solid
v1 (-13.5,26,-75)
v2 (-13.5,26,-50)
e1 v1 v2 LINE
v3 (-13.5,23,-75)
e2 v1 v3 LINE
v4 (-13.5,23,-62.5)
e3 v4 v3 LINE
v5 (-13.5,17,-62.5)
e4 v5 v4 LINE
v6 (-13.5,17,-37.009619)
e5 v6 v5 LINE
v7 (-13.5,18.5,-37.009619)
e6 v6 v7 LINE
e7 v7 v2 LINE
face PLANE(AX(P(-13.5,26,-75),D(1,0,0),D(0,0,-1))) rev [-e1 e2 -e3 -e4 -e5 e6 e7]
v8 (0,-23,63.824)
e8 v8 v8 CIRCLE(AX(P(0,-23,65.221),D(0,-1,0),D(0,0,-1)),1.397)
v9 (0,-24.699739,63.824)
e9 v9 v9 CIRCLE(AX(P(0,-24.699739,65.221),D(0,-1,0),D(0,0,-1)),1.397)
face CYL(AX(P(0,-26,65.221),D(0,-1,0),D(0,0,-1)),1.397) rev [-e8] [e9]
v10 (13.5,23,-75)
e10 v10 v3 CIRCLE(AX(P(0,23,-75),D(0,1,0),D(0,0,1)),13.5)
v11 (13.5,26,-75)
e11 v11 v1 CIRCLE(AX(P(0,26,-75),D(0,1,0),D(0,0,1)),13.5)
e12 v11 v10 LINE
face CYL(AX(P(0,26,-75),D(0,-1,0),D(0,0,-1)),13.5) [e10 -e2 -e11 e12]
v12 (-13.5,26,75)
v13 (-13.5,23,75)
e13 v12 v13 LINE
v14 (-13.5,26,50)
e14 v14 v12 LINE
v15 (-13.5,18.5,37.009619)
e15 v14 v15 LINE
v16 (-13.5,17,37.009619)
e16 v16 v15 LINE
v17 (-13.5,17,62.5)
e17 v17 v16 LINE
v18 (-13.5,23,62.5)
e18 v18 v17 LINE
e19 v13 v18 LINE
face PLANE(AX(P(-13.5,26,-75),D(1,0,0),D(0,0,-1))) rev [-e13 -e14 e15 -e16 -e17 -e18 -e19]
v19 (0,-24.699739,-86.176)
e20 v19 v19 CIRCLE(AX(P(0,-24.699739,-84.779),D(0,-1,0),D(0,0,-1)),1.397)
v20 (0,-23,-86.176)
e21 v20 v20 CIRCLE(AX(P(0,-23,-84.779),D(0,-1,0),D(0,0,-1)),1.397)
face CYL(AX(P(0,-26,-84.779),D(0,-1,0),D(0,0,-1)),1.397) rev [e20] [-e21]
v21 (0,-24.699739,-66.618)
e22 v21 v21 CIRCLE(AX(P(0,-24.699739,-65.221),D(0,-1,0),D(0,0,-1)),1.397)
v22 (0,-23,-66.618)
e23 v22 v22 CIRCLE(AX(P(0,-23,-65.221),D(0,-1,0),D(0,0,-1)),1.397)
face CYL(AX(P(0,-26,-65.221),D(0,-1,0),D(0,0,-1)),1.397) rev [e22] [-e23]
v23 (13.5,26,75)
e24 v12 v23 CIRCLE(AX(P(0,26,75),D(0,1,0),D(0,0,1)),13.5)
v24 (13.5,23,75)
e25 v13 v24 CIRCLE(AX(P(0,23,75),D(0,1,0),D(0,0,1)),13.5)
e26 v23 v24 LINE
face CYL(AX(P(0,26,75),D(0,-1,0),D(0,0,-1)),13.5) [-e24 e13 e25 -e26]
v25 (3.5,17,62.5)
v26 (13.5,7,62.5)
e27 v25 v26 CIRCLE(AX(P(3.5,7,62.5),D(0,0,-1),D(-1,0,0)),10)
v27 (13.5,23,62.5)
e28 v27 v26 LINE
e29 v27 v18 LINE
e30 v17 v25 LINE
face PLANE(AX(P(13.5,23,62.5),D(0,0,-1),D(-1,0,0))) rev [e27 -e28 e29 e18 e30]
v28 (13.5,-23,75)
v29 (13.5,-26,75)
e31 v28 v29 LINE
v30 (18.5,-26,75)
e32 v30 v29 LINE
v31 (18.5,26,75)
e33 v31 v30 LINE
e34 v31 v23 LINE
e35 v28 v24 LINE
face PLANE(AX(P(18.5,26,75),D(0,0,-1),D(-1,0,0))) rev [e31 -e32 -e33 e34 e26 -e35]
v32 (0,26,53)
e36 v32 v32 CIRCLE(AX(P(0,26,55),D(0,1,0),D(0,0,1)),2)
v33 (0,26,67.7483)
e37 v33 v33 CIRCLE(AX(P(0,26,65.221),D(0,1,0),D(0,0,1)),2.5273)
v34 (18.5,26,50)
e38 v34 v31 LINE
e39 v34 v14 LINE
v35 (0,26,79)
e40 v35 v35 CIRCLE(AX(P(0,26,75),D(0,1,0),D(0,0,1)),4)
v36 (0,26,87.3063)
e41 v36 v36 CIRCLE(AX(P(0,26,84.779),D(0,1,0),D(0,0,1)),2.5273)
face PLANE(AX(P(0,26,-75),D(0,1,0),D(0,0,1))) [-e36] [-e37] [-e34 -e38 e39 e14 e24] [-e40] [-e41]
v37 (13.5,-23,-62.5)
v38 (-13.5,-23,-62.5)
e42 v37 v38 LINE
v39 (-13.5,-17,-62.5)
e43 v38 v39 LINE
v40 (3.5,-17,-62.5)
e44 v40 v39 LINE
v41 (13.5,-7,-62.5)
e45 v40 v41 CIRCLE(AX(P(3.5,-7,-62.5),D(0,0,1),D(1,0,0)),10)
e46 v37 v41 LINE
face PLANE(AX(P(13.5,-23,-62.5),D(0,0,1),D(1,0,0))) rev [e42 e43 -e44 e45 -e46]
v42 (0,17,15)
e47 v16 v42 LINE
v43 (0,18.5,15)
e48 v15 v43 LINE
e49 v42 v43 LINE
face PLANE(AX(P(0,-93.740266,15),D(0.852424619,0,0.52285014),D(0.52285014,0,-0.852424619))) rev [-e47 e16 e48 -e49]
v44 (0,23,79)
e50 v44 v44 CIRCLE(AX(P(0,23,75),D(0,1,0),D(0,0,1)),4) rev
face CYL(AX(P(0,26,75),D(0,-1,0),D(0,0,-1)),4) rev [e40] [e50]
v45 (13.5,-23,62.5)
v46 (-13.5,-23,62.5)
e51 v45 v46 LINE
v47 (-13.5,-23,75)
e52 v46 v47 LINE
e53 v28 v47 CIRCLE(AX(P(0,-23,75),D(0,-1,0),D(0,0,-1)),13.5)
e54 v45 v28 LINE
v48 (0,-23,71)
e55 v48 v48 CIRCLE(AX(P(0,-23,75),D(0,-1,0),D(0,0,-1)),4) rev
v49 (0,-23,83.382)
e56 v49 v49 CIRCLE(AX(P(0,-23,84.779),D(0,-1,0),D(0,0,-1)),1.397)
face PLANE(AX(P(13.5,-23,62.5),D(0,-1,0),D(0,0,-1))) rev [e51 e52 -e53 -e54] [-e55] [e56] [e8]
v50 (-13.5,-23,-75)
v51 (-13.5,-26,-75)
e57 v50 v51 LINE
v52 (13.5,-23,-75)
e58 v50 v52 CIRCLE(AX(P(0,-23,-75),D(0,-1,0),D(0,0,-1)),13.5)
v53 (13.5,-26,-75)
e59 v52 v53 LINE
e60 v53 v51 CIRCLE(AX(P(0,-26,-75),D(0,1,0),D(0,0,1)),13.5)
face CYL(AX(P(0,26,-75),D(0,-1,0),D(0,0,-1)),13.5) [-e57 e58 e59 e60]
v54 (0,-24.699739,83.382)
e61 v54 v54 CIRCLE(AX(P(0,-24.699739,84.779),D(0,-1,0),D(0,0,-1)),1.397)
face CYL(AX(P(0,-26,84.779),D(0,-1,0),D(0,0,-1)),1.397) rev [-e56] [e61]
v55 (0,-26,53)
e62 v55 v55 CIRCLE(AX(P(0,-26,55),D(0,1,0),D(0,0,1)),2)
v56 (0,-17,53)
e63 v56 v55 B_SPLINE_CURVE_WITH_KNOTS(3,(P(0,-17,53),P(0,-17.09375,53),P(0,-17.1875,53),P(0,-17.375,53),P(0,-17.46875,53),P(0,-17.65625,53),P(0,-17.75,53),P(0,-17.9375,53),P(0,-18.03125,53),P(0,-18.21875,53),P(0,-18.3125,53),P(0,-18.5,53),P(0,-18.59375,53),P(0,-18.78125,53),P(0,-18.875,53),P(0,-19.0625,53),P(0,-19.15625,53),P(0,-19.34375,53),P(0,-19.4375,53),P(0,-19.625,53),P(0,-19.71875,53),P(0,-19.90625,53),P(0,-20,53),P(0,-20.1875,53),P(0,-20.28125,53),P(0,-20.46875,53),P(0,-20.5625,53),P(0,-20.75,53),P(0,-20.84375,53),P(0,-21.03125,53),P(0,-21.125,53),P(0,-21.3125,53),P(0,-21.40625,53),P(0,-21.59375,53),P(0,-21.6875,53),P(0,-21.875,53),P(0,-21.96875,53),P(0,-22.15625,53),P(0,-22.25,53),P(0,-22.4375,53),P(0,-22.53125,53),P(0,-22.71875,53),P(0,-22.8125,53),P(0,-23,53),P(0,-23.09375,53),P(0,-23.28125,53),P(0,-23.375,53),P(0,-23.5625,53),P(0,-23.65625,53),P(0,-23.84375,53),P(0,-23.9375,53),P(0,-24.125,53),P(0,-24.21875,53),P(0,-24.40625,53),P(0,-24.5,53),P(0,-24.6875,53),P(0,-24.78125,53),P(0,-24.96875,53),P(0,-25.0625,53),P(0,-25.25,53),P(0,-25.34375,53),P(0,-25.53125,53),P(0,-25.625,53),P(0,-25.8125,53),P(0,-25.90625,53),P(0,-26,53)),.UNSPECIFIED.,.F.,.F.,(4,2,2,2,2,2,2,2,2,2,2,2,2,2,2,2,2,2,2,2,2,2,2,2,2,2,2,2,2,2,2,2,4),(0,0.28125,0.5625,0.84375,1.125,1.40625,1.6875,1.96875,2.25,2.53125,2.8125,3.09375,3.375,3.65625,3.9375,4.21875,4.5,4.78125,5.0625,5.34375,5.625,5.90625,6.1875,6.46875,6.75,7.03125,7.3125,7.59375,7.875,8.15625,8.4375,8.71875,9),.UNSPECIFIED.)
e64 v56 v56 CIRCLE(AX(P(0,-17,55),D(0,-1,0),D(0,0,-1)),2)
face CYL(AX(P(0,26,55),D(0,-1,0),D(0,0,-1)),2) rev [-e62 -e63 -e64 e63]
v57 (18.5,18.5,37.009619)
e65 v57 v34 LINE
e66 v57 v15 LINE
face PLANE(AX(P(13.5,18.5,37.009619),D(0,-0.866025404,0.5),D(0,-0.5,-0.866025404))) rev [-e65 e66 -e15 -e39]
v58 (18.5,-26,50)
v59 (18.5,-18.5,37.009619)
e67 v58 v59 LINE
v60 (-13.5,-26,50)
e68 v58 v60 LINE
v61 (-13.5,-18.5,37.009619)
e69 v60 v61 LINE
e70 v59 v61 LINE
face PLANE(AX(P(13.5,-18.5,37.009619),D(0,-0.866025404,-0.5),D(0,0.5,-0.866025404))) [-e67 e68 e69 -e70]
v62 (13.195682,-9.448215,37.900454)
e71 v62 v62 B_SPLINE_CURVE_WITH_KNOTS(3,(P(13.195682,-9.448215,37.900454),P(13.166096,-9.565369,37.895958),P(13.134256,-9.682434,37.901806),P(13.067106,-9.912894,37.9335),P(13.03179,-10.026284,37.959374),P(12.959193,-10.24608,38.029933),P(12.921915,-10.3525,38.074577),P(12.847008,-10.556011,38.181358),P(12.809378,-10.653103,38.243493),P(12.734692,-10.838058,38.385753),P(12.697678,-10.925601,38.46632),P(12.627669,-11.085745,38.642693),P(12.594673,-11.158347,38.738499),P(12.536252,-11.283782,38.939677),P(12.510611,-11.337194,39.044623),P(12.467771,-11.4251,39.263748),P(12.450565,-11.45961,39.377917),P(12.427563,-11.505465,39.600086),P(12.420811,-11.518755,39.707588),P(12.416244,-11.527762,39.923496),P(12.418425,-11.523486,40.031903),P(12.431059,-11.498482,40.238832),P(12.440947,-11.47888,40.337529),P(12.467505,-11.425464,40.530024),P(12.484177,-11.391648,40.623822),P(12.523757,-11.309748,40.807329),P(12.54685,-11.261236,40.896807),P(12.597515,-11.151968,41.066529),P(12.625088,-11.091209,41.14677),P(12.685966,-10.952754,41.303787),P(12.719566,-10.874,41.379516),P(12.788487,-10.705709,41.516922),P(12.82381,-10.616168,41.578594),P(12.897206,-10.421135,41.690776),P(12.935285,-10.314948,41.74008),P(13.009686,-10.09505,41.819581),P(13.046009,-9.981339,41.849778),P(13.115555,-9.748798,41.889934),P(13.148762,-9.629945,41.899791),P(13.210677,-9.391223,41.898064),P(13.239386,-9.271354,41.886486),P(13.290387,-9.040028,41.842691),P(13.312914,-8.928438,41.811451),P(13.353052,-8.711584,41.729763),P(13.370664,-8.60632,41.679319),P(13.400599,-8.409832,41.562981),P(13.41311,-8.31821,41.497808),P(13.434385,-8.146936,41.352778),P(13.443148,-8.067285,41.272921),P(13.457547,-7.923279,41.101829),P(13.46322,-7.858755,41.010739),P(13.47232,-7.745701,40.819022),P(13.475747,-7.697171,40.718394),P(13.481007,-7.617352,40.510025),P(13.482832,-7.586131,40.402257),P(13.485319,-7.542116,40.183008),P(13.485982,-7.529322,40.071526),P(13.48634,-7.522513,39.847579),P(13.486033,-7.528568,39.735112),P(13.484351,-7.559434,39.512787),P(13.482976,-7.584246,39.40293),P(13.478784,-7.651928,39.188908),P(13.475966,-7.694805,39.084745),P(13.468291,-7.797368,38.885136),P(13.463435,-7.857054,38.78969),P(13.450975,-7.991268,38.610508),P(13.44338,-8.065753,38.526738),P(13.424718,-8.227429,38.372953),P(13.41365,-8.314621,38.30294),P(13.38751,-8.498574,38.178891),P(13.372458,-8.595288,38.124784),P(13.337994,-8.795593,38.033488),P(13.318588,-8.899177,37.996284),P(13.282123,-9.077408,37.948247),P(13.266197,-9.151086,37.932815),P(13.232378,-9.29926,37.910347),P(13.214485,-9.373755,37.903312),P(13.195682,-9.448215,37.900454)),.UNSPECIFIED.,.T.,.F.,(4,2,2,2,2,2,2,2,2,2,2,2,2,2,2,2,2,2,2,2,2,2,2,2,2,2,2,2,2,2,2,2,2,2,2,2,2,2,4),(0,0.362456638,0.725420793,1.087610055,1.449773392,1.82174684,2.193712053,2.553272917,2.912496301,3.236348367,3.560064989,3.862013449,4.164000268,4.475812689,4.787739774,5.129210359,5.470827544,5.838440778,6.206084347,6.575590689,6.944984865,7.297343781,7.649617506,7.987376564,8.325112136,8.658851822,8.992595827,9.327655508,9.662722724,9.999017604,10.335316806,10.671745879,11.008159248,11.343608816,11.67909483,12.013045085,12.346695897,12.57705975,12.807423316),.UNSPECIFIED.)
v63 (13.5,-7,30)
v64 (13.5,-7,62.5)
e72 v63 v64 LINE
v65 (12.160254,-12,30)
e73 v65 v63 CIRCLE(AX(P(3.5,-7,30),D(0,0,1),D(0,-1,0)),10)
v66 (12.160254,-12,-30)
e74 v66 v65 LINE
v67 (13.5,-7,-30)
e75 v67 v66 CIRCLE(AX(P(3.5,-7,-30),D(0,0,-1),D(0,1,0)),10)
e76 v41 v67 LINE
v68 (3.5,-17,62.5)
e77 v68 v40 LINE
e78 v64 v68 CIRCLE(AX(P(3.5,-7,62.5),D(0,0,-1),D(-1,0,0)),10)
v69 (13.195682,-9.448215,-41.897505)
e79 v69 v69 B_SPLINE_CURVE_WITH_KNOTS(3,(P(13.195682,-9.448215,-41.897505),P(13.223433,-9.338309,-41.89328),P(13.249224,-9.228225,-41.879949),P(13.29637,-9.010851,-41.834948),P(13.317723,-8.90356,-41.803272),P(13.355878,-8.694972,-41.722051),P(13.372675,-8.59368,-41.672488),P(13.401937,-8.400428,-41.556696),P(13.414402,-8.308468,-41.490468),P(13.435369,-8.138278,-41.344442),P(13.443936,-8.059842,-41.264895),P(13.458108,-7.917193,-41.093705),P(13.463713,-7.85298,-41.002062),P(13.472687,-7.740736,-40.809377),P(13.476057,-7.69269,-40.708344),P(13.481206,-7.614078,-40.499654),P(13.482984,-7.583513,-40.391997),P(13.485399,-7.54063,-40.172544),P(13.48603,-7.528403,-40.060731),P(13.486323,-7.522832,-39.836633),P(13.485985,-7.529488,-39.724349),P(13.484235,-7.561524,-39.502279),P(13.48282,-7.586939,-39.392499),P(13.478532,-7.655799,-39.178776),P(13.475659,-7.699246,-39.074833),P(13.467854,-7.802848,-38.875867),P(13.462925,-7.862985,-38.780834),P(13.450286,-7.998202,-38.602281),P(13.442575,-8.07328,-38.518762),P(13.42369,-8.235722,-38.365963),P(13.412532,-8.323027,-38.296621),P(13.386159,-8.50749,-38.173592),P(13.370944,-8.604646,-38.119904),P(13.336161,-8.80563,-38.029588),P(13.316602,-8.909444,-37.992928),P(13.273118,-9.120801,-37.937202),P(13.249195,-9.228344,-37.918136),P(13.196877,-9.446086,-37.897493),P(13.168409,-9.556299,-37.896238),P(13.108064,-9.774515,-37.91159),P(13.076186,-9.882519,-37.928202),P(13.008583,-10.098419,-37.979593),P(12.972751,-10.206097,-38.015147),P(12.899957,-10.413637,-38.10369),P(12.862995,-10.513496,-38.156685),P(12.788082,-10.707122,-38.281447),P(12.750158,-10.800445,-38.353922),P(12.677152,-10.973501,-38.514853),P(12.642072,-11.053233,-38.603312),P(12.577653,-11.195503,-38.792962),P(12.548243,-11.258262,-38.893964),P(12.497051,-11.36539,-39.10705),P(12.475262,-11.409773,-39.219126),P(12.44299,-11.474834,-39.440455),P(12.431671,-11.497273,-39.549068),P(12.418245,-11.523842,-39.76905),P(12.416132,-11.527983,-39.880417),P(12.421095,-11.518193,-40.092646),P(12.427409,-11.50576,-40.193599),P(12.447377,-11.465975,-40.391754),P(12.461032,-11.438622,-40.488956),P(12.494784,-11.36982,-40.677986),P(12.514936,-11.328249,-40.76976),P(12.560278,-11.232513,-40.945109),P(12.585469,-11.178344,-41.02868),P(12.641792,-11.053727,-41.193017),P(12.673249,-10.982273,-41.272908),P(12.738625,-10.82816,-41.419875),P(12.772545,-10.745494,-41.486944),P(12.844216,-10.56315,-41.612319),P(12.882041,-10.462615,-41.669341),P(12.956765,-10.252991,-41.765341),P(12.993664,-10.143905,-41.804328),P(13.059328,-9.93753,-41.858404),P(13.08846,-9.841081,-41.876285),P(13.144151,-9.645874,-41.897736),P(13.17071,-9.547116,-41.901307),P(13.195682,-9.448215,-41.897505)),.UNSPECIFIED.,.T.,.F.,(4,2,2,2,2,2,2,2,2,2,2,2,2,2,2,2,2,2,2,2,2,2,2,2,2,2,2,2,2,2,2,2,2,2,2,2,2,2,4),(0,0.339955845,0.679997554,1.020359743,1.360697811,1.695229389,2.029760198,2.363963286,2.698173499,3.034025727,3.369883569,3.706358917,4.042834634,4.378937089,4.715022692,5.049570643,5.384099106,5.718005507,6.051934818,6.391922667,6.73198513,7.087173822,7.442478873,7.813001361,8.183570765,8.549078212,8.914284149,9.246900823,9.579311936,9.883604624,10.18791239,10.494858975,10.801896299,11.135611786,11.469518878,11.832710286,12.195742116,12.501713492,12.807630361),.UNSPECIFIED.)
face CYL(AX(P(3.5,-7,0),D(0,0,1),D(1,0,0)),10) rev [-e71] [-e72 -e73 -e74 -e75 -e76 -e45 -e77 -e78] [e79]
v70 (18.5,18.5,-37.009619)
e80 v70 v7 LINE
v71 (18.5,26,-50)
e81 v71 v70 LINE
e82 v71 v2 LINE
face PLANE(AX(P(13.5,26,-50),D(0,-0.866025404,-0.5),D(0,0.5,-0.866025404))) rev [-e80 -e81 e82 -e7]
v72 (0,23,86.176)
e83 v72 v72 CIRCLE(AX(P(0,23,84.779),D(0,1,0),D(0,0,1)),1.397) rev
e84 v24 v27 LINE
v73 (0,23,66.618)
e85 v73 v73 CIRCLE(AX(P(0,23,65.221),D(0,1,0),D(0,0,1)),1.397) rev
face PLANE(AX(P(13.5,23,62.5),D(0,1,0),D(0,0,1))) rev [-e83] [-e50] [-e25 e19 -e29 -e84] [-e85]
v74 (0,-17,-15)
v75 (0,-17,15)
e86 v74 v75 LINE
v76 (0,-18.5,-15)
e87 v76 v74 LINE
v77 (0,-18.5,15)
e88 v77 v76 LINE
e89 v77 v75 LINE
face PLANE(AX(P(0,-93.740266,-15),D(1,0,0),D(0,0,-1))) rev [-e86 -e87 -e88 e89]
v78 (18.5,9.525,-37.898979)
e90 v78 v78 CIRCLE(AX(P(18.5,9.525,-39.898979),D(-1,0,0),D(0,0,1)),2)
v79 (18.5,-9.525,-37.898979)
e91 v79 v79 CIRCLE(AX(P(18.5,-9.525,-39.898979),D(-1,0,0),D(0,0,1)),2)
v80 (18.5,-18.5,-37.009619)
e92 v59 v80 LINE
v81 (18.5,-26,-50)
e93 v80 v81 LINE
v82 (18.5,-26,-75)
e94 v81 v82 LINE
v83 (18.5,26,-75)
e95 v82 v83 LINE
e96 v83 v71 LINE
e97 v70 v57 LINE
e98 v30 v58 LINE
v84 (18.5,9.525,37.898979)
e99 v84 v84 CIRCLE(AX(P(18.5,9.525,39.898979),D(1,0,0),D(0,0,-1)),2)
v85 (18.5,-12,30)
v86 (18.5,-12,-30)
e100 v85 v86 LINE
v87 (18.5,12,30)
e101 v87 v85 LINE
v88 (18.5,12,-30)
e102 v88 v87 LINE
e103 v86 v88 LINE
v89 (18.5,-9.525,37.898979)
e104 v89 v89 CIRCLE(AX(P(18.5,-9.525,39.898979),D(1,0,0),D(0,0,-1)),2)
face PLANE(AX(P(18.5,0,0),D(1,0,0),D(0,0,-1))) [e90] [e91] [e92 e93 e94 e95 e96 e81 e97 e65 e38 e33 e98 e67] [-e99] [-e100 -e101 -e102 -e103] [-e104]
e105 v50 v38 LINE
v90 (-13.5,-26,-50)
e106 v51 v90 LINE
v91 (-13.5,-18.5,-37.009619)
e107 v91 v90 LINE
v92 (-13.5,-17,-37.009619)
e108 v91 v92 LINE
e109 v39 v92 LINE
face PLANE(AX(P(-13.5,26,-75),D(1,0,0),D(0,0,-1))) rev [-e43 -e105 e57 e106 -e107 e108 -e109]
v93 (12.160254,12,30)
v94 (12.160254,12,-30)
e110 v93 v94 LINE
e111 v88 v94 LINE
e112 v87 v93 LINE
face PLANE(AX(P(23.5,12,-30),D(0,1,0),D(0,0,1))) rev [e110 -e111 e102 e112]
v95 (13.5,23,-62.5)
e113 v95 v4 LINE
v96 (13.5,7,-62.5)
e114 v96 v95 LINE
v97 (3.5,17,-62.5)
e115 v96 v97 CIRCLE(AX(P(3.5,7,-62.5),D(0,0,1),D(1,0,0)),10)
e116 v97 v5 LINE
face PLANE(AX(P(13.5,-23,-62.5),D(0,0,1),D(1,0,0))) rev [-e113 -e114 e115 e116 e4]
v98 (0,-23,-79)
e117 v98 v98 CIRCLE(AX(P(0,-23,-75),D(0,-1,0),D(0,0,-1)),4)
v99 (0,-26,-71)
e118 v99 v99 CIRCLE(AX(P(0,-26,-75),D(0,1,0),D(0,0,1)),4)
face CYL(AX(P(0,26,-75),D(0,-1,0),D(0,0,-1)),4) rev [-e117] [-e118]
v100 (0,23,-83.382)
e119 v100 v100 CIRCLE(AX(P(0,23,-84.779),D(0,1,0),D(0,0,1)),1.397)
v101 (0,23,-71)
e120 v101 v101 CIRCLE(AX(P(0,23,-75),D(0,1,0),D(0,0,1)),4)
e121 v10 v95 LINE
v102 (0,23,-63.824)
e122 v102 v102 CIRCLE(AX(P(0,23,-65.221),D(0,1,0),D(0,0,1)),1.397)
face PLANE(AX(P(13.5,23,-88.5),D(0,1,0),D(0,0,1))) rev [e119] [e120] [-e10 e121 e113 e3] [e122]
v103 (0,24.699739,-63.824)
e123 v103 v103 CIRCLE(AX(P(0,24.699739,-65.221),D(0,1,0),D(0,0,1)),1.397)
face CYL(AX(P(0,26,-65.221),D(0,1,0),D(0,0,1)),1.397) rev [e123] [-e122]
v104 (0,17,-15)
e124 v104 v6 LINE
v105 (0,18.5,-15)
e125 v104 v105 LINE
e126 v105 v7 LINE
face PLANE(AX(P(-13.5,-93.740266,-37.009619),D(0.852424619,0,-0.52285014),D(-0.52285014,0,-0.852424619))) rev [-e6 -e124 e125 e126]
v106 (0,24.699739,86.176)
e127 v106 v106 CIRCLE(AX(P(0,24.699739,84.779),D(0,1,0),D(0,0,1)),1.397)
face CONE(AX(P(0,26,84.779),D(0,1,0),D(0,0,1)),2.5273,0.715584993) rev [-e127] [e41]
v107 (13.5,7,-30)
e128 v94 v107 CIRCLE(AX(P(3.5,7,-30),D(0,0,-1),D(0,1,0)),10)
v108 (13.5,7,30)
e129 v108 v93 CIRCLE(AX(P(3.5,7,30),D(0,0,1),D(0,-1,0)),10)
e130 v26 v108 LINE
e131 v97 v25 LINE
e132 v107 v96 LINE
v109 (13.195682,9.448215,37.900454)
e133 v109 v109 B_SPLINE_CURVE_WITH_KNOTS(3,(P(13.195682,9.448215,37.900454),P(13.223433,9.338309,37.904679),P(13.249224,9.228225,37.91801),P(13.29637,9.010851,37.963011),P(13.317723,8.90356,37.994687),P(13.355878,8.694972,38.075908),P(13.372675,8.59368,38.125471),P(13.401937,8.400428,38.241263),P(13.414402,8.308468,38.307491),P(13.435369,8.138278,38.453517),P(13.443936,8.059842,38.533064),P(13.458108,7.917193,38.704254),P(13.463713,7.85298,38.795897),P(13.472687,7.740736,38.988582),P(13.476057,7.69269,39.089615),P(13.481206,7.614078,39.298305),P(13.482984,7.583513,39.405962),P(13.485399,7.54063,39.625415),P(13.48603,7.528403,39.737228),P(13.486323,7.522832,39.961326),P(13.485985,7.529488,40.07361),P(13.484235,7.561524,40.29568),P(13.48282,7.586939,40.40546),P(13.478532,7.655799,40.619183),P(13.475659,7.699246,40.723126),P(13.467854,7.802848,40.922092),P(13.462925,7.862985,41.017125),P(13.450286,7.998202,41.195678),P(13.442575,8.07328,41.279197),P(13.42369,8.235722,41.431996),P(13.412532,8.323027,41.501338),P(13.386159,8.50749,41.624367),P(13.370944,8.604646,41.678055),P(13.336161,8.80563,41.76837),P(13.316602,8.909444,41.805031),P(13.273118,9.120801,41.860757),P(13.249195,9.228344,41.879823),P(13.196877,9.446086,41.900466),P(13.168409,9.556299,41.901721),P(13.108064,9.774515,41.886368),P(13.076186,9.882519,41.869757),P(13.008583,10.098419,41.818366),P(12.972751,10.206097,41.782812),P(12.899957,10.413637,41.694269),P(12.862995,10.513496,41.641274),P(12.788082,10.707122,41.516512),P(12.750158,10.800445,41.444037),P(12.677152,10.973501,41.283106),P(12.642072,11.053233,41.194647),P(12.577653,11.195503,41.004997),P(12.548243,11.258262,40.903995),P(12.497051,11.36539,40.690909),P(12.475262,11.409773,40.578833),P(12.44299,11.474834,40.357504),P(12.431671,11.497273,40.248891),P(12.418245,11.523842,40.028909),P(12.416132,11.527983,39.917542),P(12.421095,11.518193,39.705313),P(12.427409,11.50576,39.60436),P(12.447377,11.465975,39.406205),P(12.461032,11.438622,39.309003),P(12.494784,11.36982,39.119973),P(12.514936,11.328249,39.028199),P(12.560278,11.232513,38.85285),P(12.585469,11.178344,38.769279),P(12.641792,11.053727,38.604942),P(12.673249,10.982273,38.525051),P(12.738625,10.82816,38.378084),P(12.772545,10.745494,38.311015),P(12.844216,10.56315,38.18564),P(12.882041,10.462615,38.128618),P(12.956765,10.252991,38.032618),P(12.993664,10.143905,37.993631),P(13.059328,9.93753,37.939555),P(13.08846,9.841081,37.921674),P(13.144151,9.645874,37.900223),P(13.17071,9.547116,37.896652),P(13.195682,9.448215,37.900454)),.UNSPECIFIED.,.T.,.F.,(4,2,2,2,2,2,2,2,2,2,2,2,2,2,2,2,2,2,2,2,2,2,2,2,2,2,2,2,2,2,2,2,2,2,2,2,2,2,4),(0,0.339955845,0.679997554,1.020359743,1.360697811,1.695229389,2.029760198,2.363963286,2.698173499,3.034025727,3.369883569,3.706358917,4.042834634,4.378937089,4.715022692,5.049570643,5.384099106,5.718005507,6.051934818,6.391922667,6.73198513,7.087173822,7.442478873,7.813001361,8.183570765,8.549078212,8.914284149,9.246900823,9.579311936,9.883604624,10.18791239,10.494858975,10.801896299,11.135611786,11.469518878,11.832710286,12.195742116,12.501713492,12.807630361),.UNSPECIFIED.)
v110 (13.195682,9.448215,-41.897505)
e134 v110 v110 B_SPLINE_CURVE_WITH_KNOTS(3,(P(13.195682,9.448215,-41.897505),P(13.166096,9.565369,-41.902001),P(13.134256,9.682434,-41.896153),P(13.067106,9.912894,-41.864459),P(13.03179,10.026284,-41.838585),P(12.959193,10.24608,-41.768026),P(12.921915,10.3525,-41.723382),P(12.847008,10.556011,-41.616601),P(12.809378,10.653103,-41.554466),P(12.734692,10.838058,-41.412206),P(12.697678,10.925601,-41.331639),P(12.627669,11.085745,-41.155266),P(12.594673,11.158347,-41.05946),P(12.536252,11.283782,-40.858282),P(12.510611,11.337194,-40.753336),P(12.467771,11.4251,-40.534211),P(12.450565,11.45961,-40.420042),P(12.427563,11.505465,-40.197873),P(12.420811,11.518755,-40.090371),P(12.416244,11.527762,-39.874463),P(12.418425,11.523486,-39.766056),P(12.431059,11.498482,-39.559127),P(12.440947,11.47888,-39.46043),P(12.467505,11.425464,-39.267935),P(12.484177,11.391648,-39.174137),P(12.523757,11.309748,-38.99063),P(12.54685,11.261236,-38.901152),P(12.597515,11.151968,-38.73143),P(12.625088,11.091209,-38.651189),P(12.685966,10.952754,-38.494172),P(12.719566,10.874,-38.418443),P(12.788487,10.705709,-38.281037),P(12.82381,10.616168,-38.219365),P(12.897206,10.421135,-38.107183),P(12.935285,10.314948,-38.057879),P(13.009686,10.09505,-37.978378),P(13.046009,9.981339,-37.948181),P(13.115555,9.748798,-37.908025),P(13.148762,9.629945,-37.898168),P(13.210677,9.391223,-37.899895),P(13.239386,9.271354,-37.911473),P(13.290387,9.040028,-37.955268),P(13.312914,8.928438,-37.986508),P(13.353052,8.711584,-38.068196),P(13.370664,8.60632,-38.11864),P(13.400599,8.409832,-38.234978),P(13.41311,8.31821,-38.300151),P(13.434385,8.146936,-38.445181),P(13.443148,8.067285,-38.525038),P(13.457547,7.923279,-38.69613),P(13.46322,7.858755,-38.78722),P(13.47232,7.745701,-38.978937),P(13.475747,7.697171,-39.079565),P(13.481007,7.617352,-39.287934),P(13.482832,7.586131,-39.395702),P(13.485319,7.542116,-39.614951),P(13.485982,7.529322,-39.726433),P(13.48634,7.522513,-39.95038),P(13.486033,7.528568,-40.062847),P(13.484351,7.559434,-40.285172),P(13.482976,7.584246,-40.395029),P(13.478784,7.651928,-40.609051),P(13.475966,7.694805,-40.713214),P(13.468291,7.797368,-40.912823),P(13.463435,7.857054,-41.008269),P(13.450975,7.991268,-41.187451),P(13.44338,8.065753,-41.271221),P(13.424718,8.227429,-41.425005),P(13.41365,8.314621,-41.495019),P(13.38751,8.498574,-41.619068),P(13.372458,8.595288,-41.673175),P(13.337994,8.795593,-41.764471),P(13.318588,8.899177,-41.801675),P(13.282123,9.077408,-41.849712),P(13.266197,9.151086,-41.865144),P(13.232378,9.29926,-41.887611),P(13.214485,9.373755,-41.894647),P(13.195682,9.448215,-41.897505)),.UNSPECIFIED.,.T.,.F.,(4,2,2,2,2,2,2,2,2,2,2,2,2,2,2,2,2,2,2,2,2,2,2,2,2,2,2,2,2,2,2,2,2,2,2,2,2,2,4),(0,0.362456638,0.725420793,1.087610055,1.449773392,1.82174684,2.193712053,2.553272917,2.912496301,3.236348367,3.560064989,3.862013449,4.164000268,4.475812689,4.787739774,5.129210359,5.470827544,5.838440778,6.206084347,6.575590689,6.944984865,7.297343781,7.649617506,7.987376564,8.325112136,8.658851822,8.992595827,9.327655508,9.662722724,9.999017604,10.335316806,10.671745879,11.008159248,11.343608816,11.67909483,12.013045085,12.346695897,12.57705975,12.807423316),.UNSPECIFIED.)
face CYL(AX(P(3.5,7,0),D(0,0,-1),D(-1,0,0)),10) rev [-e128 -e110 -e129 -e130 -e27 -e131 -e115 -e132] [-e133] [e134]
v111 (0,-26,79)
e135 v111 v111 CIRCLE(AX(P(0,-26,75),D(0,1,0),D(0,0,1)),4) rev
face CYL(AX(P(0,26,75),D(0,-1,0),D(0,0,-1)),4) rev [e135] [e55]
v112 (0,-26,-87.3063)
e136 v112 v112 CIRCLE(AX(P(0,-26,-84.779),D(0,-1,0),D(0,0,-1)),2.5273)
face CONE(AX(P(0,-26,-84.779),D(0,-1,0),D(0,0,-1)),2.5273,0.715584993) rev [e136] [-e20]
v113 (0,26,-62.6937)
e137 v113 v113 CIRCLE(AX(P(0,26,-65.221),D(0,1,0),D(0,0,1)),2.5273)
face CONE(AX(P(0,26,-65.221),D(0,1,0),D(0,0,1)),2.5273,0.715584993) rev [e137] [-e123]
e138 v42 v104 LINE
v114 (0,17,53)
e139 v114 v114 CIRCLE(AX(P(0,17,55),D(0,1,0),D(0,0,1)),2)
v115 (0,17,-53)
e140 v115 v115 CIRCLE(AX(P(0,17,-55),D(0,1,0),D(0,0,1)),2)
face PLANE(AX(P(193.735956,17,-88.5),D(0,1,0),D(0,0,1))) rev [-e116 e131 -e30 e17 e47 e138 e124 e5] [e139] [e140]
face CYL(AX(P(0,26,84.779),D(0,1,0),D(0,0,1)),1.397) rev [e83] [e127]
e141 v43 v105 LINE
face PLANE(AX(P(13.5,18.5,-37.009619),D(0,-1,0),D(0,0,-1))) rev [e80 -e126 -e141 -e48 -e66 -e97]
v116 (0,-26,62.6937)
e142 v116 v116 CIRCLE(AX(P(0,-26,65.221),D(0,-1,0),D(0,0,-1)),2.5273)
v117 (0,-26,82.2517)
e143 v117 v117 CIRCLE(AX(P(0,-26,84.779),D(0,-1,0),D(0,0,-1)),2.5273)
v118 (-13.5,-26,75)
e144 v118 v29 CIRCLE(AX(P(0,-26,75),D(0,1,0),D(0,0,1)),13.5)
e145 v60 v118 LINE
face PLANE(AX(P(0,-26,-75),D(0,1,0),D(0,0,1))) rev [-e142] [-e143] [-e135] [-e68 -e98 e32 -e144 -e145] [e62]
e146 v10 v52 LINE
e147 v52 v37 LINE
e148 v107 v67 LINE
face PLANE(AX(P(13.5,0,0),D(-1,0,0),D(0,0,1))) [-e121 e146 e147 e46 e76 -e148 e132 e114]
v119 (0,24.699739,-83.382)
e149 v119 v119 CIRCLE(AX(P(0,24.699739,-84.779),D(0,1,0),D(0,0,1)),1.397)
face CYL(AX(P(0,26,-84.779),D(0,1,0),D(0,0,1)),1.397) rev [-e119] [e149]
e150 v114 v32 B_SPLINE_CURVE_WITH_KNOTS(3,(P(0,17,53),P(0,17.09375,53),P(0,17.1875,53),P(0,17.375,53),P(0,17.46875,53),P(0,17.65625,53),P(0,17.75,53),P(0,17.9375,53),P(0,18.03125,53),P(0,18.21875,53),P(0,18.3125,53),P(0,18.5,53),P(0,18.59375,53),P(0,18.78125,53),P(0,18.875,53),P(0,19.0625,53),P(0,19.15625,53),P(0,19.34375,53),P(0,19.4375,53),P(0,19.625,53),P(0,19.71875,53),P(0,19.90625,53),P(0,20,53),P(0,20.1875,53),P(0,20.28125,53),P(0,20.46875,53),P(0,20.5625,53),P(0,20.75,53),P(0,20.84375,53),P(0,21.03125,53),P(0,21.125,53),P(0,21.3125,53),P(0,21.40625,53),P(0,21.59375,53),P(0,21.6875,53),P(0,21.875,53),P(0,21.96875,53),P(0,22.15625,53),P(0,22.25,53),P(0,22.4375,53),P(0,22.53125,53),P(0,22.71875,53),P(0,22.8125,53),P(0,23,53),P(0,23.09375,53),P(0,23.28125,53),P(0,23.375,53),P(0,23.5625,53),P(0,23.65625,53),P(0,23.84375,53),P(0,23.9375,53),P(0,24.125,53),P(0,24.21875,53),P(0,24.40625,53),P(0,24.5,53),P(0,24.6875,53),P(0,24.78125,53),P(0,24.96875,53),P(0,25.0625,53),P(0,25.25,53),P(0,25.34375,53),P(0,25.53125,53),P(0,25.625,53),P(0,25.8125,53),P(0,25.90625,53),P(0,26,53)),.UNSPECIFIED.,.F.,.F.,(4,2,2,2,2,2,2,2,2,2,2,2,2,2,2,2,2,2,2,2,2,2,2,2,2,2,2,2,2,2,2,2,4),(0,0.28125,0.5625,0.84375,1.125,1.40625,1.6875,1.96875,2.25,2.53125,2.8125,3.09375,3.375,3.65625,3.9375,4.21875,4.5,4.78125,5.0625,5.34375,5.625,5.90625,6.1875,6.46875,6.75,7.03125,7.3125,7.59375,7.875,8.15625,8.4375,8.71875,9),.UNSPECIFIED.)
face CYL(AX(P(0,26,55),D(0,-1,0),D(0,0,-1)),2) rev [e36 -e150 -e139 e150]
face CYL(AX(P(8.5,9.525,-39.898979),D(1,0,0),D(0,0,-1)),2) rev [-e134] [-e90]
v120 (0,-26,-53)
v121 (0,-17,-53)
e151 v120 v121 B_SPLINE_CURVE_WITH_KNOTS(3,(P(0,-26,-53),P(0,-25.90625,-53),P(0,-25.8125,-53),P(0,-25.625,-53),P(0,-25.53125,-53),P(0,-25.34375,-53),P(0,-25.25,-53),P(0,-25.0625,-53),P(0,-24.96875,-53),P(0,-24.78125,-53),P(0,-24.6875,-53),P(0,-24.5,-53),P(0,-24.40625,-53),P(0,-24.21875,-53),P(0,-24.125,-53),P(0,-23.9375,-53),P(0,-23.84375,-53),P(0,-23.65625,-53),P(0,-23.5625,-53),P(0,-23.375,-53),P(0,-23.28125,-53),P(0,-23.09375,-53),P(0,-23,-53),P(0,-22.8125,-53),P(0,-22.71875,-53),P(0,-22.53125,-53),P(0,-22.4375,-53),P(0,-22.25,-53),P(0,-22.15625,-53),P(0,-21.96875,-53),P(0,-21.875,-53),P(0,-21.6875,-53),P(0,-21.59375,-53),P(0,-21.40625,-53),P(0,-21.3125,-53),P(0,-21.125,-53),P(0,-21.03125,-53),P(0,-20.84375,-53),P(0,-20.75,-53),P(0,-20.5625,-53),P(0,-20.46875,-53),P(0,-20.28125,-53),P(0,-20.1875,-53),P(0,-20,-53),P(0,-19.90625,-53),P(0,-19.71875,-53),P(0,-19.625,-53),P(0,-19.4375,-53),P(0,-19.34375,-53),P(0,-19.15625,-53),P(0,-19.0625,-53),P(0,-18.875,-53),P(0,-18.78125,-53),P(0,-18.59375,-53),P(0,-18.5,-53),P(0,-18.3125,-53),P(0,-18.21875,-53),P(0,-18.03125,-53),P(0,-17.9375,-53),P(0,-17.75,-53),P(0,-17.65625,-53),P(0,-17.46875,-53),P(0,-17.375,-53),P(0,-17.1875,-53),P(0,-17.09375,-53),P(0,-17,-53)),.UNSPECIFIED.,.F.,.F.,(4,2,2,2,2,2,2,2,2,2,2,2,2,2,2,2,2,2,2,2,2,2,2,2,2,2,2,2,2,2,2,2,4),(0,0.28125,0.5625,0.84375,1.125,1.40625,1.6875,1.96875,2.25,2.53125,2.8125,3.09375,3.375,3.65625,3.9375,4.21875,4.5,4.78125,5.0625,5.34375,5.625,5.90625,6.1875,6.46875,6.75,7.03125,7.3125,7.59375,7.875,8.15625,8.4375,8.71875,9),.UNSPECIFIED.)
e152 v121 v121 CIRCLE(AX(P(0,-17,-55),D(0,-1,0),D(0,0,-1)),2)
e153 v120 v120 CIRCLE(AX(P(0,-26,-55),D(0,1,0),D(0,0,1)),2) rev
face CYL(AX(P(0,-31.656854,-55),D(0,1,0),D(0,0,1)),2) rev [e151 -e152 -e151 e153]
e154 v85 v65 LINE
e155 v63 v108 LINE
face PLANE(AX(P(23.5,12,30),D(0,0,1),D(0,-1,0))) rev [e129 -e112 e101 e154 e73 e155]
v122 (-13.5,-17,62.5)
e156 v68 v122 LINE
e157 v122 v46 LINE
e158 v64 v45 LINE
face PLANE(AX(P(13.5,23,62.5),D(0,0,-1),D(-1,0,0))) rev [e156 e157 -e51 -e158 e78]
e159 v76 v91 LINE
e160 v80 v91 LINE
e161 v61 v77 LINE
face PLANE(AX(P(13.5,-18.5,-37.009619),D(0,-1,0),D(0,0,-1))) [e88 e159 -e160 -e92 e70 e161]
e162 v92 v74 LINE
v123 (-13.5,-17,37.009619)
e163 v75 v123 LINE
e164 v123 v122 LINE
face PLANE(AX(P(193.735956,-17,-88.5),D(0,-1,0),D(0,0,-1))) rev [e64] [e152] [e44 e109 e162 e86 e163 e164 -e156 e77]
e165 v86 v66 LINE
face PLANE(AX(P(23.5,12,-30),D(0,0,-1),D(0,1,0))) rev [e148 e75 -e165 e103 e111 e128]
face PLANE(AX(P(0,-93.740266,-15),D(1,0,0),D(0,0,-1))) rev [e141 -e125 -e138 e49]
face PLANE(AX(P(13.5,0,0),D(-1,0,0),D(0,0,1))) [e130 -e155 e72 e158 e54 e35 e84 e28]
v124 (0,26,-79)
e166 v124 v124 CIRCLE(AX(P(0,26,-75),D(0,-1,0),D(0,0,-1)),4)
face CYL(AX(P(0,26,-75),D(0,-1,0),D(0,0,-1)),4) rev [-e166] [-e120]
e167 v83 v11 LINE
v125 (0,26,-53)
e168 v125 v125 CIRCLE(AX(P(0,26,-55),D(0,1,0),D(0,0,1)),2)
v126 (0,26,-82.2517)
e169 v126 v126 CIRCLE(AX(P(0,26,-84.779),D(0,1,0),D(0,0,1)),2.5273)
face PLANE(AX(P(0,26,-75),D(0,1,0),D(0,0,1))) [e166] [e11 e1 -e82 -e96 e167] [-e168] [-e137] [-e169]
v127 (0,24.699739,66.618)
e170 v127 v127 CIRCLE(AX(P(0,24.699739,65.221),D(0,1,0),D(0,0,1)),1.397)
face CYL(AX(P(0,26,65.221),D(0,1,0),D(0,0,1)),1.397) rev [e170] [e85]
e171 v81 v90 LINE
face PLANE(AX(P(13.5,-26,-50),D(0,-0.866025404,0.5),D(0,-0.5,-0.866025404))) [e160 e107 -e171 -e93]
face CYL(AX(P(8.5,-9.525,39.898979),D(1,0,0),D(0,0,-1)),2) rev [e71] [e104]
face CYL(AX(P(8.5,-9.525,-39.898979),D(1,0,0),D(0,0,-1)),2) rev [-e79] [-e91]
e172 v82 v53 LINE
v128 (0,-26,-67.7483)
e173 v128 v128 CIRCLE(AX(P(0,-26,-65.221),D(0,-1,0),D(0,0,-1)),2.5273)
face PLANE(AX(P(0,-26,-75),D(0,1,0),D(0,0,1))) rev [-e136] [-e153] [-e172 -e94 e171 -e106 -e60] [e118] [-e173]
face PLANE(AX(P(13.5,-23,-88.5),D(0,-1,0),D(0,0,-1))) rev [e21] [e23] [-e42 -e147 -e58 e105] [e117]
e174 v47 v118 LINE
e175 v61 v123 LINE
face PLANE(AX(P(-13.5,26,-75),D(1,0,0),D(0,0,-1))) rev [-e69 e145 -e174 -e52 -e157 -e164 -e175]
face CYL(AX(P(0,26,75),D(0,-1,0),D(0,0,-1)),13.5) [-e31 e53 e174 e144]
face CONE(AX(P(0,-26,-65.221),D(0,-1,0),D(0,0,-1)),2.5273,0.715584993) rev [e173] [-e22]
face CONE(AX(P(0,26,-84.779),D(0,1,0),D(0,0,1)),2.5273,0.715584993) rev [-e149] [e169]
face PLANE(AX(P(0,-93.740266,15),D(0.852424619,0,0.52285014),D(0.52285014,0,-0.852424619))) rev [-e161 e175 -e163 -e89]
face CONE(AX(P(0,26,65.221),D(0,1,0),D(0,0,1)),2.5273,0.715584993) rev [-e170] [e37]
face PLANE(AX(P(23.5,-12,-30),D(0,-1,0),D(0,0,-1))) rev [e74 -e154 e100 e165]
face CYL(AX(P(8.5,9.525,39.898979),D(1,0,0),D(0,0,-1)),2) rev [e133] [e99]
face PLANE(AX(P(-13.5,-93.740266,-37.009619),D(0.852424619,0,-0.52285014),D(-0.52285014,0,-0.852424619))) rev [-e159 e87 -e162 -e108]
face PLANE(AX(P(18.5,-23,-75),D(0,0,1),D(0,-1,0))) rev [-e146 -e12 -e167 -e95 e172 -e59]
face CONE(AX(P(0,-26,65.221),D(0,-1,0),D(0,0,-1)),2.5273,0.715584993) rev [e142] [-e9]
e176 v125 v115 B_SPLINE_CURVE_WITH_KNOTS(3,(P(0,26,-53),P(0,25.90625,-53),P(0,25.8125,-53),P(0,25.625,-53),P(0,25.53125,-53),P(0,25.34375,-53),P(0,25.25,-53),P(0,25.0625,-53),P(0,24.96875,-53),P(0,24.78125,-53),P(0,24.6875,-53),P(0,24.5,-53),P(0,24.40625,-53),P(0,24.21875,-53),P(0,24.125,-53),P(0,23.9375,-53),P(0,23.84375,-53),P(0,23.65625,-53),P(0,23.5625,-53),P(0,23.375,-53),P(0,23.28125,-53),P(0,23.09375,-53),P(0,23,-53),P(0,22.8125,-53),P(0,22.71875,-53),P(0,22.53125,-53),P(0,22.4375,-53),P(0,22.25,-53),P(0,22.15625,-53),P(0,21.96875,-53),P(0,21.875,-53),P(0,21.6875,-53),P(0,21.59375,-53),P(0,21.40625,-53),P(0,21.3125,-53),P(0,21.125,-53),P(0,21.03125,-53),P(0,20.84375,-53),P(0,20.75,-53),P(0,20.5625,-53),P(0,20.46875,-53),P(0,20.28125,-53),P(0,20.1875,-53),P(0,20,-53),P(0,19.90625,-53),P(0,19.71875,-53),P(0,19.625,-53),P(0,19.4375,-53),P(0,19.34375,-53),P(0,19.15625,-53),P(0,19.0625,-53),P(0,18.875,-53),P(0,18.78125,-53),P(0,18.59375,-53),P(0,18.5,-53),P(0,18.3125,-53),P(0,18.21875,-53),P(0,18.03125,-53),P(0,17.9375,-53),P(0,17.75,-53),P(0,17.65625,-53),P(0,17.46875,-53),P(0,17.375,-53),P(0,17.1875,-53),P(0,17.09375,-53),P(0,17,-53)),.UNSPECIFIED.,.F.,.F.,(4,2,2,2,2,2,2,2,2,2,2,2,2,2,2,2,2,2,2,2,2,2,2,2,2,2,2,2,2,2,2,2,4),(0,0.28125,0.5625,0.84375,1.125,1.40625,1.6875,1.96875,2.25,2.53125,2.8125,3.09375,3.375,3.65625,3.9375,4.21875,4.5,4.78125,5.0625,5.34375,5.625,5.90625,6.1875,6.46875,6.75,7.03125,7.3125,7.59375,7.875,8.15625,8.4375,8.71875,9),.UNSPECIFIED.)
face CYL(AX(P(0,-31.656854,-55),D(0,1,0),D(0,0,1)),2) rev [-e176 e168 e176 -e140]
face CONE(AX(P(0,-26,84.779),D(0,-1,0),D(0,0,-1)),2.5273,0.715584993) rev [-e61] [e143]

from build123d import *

# Parameters (mm, degrees)
SKETCH1_R                                     = 2
BOSS_EXTRUDE1_DEPTH                           = 26
CUT_EXTRUDE1_DEPTH                            = 97.110613358
CUT_EXTRUDE2_DEPTH                            = 97.110613358
CUT_EXTRUDE2_DEPTH_BACK                       = 97.110613358
SKETCH4_W                                     = 26
SKETCH4_H                                     = 6
SKETCH5_W                                     = 177
SKETCH5_H                                     = 34
CUT_EXTRUDE3_DEPTH                            = 22
SKETCH6_W                                     = 22.988088482
SKETCH6_H                                     = 34
CUT_EXTRUDE4_DEPTH                            = 95.827474922
SKETCH7_W                                     = 22.988088482
SKETCH7_H                                     = 34
CUT_EXTRUDE5_DEPTH                            = 95.827474922
CSK_FOR_3_FLAT_HEAD_MACHINE_SCREW1_AT_2_COUNT = 2
CSK_FOR_3_FLAT_HEAD_MACHINE_SCREW1_AT_2_PITCH = 19.558
SKETCH13_R                                    = 4
CUT_EXTRUDE6_DEPTH                            = 104.530188834
BOSS_EXTRUDE2_DEPTH                           = 5
SKETCH15_W                                    = 125
SKETCH15_H                                    = 34
CUT_EXTRUDE7_DEPTH                            = 5
SKETCH17_W                                    = 5
SKETCH17_H                                    = 52
BOSS_EXTRUDE4_DEPTH                           = 12.5
SKETCH19_R                                    = 2
CUT_EXTRUDE11_DEPTH                           = 10
CUT_EXTRUDE8_REACH                            = 106.3
SKETCH18_R                                    = 2
SKETCH20_W                                    = 60
SKETCH20_H                                    = 24
CUT_EXTRUDE10_DEPTH                           = 10
CUT_EXTRUDE12_REACH                           = 102.771
SKETCH22_W                                    = 5
SKETCH22_H                                    = 46
BOSS_EXTRUDE5_DEPTH                           = 12.5
FILLET1_R                                     = 10


with BuildPart() as part:
    # Sketch1 → Boss-Extrude1 (new, symmetric)
    with BuildSketch(Plane(origin=(0, 0, 0), x_dir=(1, 0, 0), z_dir=(0, 1, 0))):
        with BuildLine():
            Line((-13.5, 75), (-13.5, -75))
            ThreePointArc((-13.5, -75), (0, -88.5), (13.5, -75))
            Line((13.5, -75), (13.5, 75))
            ThreePointArc((13.5, 75), (0, 88.5), (-13.5, 75))
        make_face()
        with Locations(Location((0, -55, 0), (0, 0, 90))):
            Circle(SKETCH1_R, mode=Mode.SUBTRACT)
    extrude(amount=BOSS_EXTRUDE1_DEPTH, both=True)

    # Sketch3 → Cut-Extrude1 (cut, symmetric)
    with BuildSketch(Plane.ZY.offset(13.5)):
        Polygon((-50, 26), (-37.009618943, 18.5), (37.009618943, 18.5), (50, 26), align=None)
    cut_extrude1 = extrude(amount=CUT_EXTRUDE1_DEPTH, both=True, mode=Mode.SUBTRACT)

    # Mirror1: Cut-Extrude1 across plane
    add(cut_extrude1.mirror(Plane.ZX), mode=Mode.SUBTRACT)

    # Sketch4 → Cut-Extrude2 (cut, two sides: drawn at the far end of the back side and taken through both)
    with BuildSketch(Plane.ZY.offset(13.5).offset(-CUT_EXTRUDE2_DEPTH_BACK)):
        with Locations((75.5, 20)):
            Rectangle(SKETCH4_W, SKETCH4_H)
        with Locations((-75.5, 20)):
            Rectangle(SKETCH4_W, SKETCH4_H)
        with Locations((-75.5, -20)):
            Rectangle(SKETCH4_W, SKETCH4_H)
        with Locations((75.5, -20)):
            Rectangle(SKETCH4_W, SKETCH4_H)
    extrude(amount=CUT_EXTRUDE2_DEPTH + CUT_EXTRUDE2_DEPTH_BACK, mode=Mode.SUBTRACT)

    # Sketch5 → Cut-Extrude3 (cut)
    with BuildSketch(Plane.ZY.offset(13.5)):
        Rectangle(SKETCH5_W, SKETCH5_H)
    extrude(amount=-CUT_EXTRUDE3_DEPTH, mode=Mode.SUBTRACT)

    # Sketch6 → Cut-Extrude4 (cut, through all)
    with BuildSketch(Plane.ZY.offset(-8.5)):
        with Locations((73.994044241, 0)):
            Rectangle(SKETCH6_W, SKETCH6_H)
    extrude(amount=-CUT_EXTRUDE4_DEPTH, mode=Mode.SUBTRACT)

    # Sketch7 → Cut-Extrude5 (cut, through all)
    with BuildSketch(Plane.ZY.offset(-8.5)):
        with Locations((-73.994044241, 0)):
            Rectangle(SKETCH7_W, SKETCH7_H)
    extrude(amount=-CUT_EXTRUDE5_DEPTH, mode=Mode.SUBTRACT)

    # Sketch12 → CSK for #3 Flat Head Machine Screw1 (revolve, cut)
    with BuildSketch(Plane(origin=(0, 26, 65.221), x_dir=(0, 0, 1), z_dir=(1, 0, 0))):
        Polygon((0, 0), (0, 3.839402285), (1.397, 3), (1.397, 1.300261411), (2.5273, 0), align=None)
    csk_for_3_flat_head_machine_screw1 = revolve(axis=Axis((0, 32.35, 65.221), (0, -1, 0)), mode=Mode.SUBTRACT)

    # CSK for #3 Flat Head Machine Screw1 at 2: CSK for #3 Flat Head Machine Screw1 ×2
    with Locations(*[(0, 0, i * CSK_FOR_3_FLAT_HEAD_MACHINE_SCREW1_AT_2_PITCH) for i in range(1, CSK_FOR_3_FLAT_HEAD_MACHINE_SCREW1_AT_2_COUNT)]):
        add(csk_for_3_flat_head_machine_screw1, mode=Mode.SUBTRACT)

    # Mirror5: CSK for #3 Flat Head Machine Screw1 across plane
    add(csk_for_3_flat_head_machine_screw1.mirror(Plane.ZX), mode=Mode.SUBTRACT)

    # Mirror5 copy 1 sketch → Mirror5 copy 1 (revolve, cut)
    with BuildSketch(Plane(origin=(0, -26, 84.779), x_dir=(0, 0, 1), z_dir=(1, 0, 0))):
        Polygon((0, 0), (0, -3.839402285), (1.397, -3), (1.397, -1.300261411), (2.5273, 0), align=None)
    revolve(axis=Axis((0, -32.35, 84.779), (0, -1, 0)), mode=Mode.SUBTRACT)

    # Mirror3: CSK for #3 Flat Head Machine Screw1 across plane
    add(csk_for_3_flat_head_machine_screw1.mirror(Plane.XY), mode=Mode.SUBTRACT)

    # Mirror3 copy 1 sketch → Mirror3 copy 1 (revolve, cut)
    with BuildSketch(Plane(origin=(0, 26, -84.779), x_dir=(0, 0, -1), z_dir=(1, 0, 0))):
        Polygon((0, 0), (0, -3.839402285), (1.397, -3), (1.397, -1.300261411), (2.5273, 0), align=None)
    revolve(axis=Axis((0, 32.35, -84.779), (0, 1, 0)), mode=Mode.SUBTRACT)

    # Sketch13 → Cut-Extrude6 (cut, symmetric)
    with BuildSketch(Plane.XZ.offset(26)):
        with Locations(Location((0, -75, 0), (0, 0, 270))):
            Circle(SKETCH13_R)
    cut_extrude6 = extrude(amount=CUT_EXTRUDE6_DEPTH, both=True, mode=Mode.SUBTRACT)

    # Mirror4: Cut-Extrude6 across plane
    add(cut_extrude6.mirror(Plane.XY), mode=Mode.SUBTRACT)

    # Sketch14 → Boss-Extrude2 (add)
    with BuildSketch(Plane(origin=(13.5, 0, 0), x_dir=(0, 0, -1), z_dir=(1, 0, 0))):
        Polygon((-75, 26), (-75, 23), (-62.5, 23), (-62.5, -23), (-75, -23), (-75, -26), (-50, -26), (-37.009618943, -18.5), (37.009618943, -18.5), (50, -26), (75, -26), (75, -23), (62.5, -23), (62.5, 23), (75, 23), (75, 26), (50, 26), (37.009618943, 18.5), (-37.009618943, 18.5), (-50, 26), align=None)
    extrude(amount=BOSS_EXTRUDE2_DEPTH)

    # Sketch15 → Cut-Extrude7 (cut)
    with BuildSketch(Plane.ZY.offset(-8.5)):
        Rectangle(SKETCH15_W, SKETCH15_H)
    extrude(amount=-CUT_EXTRUDE7_DEPTH, mode=Mode.SUBTRACT)

    # Sketch17 → Boss-Extrude4 (add)
    with BuildSketch(Plane.XY.offset(62.5)):
        with Locations((16, 0)):
            Rectangle(SKETCH17_W, SKETCH17_H)
    extrude(amount=BOSS_EXTRUDE4_DEPTH)

    # Mirror6 copy 1 sketch → Mirror6 copy 1 (revolve, cut)
    with BuildSketch(Plane(origin=(0, -26, -65.221), x_dir=(0, 0, -1), z_dir=(1, 0, 0))):
        Polygon((0, 0), (0, 3.839402285), (1.397, 3), (1.397, 1.300261411), (2.5273, 0), align=None)
    revolve(axis=Axis((0, -32.35, -65.221), (0, 1, 0)), mode=Mode.SUBTRACT)

    # Mirror6 copy 2 sketch → Mirror6 copy 2 (revolve, cut)
    with BuildSketch(Plane(origin=(0, -26, -84.779), x_dir=(0, 0, -1), z_dir=(1, 0, 0))):
        Polygon((0, 0), (0, 3.839402285), (1.397, 3), (1.397, 1.300261411), (2.5273, 0), align=None)
    revolve(axis=Axis((0, -32.35, -84.779), (0, 1, 0)), mode=Mode.SUBTRACT)

    # Mirror6 copy 3 sketch → Mirror6 copy 3 (revolve, cut)
    with BuildSketch(Plane(origin=(0, -26, 65.221), x_dir=(0, 0, 1), z_dir=(1, 0, 0))):
        Polygon((0, 0), (0, -3.839402285), (1.397, -3), (1.397, -1.300261411), (2.5273, 0), align=None)
    revolve(axis=Axis((0, -32.35, 65.221), (0, -1, 0)), mode=Mode.SUBTRACT)

    # Mirror6 copy 4 sketch → Mirror6 copy 4 (revolve, cut)
    with BuildSketch(Plane(origin=(0, -26, 84.779), x_dir=(0, 0, 1), z_dir=(1, 0, 0))):
        Polygon((0, 0), (0, -3.839402285), (1.397, -3), (1.397, -1.300261411), (2.5273, 0), align=None)
    revolve(axis=Axis((0, -32.35, 84.779), (0, -1, 0)), mode=Mode.SUBTRACT)

    # Sketch19 → Cut-Extrude11 (cut)
    with BuildSketch(Plane(origin=(18.5, 0, 0), x_dir=(0, 0, -1), z_dir=(1, 0, 0))):
        with Locations((-39.898979486, 9.525)):
            Circle(SKETCH19_R)
        with Locations((-39.898979486, -9.525)):
            Circle(SKETCH19_R)
    cut_extrude11 = extrude(amount=-CUT_EXTRUDE11_DEPTH, mode=Mode.SUBTRACT)

    # Cut-Extrude8: up to this face of the body (flat: up to its plane)
    cut_extrude8_end = Plane(part.part.faces().sort_by_distance((0, -26, -87.99937539))[0])
    # Sketch18 → Cut-Extrude8 (cut, up to the picked face)
    with BuildSketch(Plane(origin=(0, 26, 0), x_dir=(1, 0, 0), z_dir=(0, 1, 0)), mode=Mode.PRIVATE) as cut_extrude8_sk1:
        with Locations(Location((0, 55, 0), (0, 0, 270))):
            Circle(SKETCH18_R)
    cut_extrude8_tool1 = split(extrude(cut_extrude8_sk1.sketch, amount=-CUT_EXTRUDE8_REACH, mode=Mode.PRIVATE), bisect_by=cut_extrude8_end, keep=Keep.BOTH, mode=Mode.PRIVATE)
    add(cut_extrude8_tool1.solids().sort_by(Axis((0, 26, -55), (0, -1, 0)))[0], mode=Mode.SUBTRACT)

    # Sketch20 → Cut-Extrude10 (cut)
    with BuildSketch(Plane.ZY.offset(-13.5)):
        Rectangle(SKETCH20_W, SKETCH20_H)
    extrude(amount=-CUT_EXTRUDE10_DEPTH, mode=Mode.SUBTRACT)

    # Mirror7: Cut-Extrude11 across plane
    add(cut_extrude11.mirror(Plane.XY), mode=Mode.SUBTRACT)

    # Cut-Extrude12: up to this face of the body (flat: up to its plane)
    cut_extrude12_end = Plane(part.part.faces().sort_by_distance((2.5, -18.5, 0))[0])
    # Sketch21 → Cut-Extrude12 (cut, up to the picked face)
    with BuildSketch(Plane(origin=(0, 18.5, 0), x_dir=(1, 0, 0), z_dir=(0, 1, 0)), mode=Mode.PRIVATE) as cut_extrude12_sk1:
        Polygon((-13.5, 37.009618943), (0, 15), (0, -15), (-13.5, -37.009618943), align=None)
    cut_extrude12_tool1 = split(extrude(cut_extrude12_sk1.sketch, amount=-CUT_EXTRUDE12_REACH, mode=Mode.PRIVATE), bisect_by=cut_extrude12_end, keep=Keep.BOTH, mode=Mode.PRIVATE)
    add(cut_extrude12_tool1.solids().sort_by(Axis((-7.702163, 18.5, 0), (0, -1, 0)))[0], mode=Mode.SUBTRACT)

    # Sketch22 → Boss-Extrude5 (add)
    with BuildSketch(Plane(origin=(0, 0, -62.5), x_dir=(-1, 0, 0), z_dir=(0, 0, -1))):
        with Locations((-16, 0)):
            Rectangle(SKETCH22_W, SKETCH22_H)
    extrude(amount=BOSS_EXTRUDE5_DEPTH)

    # Fillet1
    # the kernel refuses this fillet: 10 mm, written as the material it adds along each edge
    with BuildSketch(Plane(origin=(13.5, 17, -62.5), x_dir=(0, -1, 0), z_dir=(0, 0, 1))) as fillet1_piece_1_section:
        with BuildLine():
            CenterArc((FILLET1_R, -FILLET1_R), FILLET1_R, 90, 90)
            Line((0, -FILLET1_R), (0, 0))
            Line((0, 0), (FILLET1_R, 0))
        make_face()
    fillet1_piece_1 = extrude(amount=150, mode=Mode.PRIVATE)
    fillet1_piece_1 = fillet1_piece_1 - Plane(origin=(13.095089825, 9.525, -39.898979486), x_dir=(0, 0, 1), z_dir=(1, 0, 0)) * Cylinder(2, 341, mode=Mode.PRIVATE)
    fillet1_piece_1 = split(fillet1_piece_1, bisect_by=Plane(origin=(13.095089825, 10.807057583, -30), z_dir=(0, 0, -1)), keep=Keep.TOP, mode=Mode.PRIVATE)
    add(fillet1_piece_1)
    with BuildSketch(Plane(origin=(13.5, 17, -62.5), x_dir=(0, -1, 0), z_dir=(0, 0, 1))) as fillet1_piece_2_section:
        with BuildLine():
            CenterArc((FILLET1_R, -FILLET1_R), FILLET1_R, 90, 90)
            Line((0, -FILLET1_R), (0, 0))
            Line((0, 0), (FILLET1_R, 0))
        make_face()
    fillet1_piece_2 = extrude(amount=125, mode=Mode.PRIVATE)
    fillet1_piece_2 = split(fillet1_piece_2, bisect_by=Plane(origin=(11.059751506, 12, 0), z_dir=(0, 1, 0)), keep=Keep.TOP, mode=Mode.PRIVATE)
    add(fillet1_piece_2)
    with BuildSketch(Plane(origin=(13.5, 17, -87.5), x_dir=(0, -1, 0), z_dir=(0, 0, 1))) as fillet1_piece_3_section:
        with BuildLine():
            CenterArc((FILLET1_R, -FILLET1_R), FILLET1_R, 90, 90)
            Line((0, -FILLET1_R), (0, 0))
            Line((0, 0), (FILLET1_R, 0))
        make_face()
    fillet1_piece_3 = extrude(amount=150, mode=Mode.PRIVATE)
    fillet1_piece_3 = fillet1_piece_3 - Plane(origin=(13.095089825, 9.525, 39.898979486), x_dir=(0, 0, -1), z_dir=(1, 0, 0)) * Cylinder(2, 341, mode=Mode.PRIVATE)
    fillet1_piece_3 = split(fillet1_piece_3, bisect_by=Plane(origin=(13.095089825, 10.807057583, 30), z_dir=(0, 0, 1)), keep=Keep.TOP, mode=Mode.PRIVATE)
    add(fillet1_piece_3)
    with BuildSketch(Plane(origin=(13.5, -17, 62.5), x_dir=(-1, 0, 0), z_dir=(0, 0, -1))) as fillet1_piece_4_section:
        with BuildLine():
            CenterArc((FILLET1_R, FILLET1_R), FILLET1_R, 180, 90)
            Line((0, FILLET1_R), (0, 0))
            Line((0, 0), (FILLET1_R, 0))
        make_face()
    fillet1_piece_4 = extrude(amount=125, mode=Mode.PRIVATE)
    fillet1_piece_4 = split(fillet1_piece_4, bisect_by=Plane(origin=(11.059751506, -12, 46.25), z_dir=(0, -1, 0)), keep=Keep.TOP, mode=Mode.PRIVATE)
    add(fillet1_piece_4)
    with BuildSketch(Plane(origin=(13.5, -17, 62.5), x_dir=(-1, 0, 0), z_dir=(0, 0, -1))) as fillet1_piece_5_section:
        with BuildLine():
            CenterArc((FILLET1_R, FILLET1_R), FILLET1_R, 180, 90)
            Line((0, FILLET1_R), (0, 0))
            Line((0, 0), (FILLET1_R, 0))
        make_face()
    fillet1_piece_5 = extrude(amount=150, mode=Mode.PRIVATE)
    fillet1_piece_5 = split(fillet1_piece_5, bisect_by=Plane(origin=(13.095085978, -10.807036513, 30), z_dir=(0, 0, 1)), keep=Keep.TOP, mode=Mode.PRIVATE)
    fillet1_piece_5 = fillet1_piece_5 - Plane(origin=(13.095085978, -9.525, 39.898979486), x_dir=(0, 0, -1), z_dir=(1, 0, 0)) * Cylinder(2, 341, mode=Mode.PRIVATE)
    add(fillet1_piece_5)
    with BuildSketch(Plane(origin=(13.5, -17, 87.5), x_dir=(-1, 0, 0), z_dir=(0, 0, -1))) as fillet1_piece_6_section:
        with BuildLine():
            CenterArc((FILLET1_R, FILLET1_R), FILLET1_R, 180, 90)
            Line((0, FILLET1_R), (0, 0))
            Line((0, 0), (FILLET1_R, 0))
        make_face()
    fillet1_piece_6 = extrude(amount=150, mode=Mode.PRIVATE)
    fillet1_piece_6 = split(fillet1_piece_6, bisect_by=Plane(origin=(13.095085978, -10.807036513, -30), z_dir=(0, 0, -1)), keep=Keep.TOP, mode=Mode.PRIVATE)
    fillet1_piece_6 = fillet1_piece_6 - Plane(origin=(13.095085978, -9.525, -39.898979486), x_dir=(0, 0, 1), z_dir=(1, 0, 0)) * Cylinder(2, 341, mode=Mode.PRIVATE)
    add(fillet1_piece_6)


solid = part.part
